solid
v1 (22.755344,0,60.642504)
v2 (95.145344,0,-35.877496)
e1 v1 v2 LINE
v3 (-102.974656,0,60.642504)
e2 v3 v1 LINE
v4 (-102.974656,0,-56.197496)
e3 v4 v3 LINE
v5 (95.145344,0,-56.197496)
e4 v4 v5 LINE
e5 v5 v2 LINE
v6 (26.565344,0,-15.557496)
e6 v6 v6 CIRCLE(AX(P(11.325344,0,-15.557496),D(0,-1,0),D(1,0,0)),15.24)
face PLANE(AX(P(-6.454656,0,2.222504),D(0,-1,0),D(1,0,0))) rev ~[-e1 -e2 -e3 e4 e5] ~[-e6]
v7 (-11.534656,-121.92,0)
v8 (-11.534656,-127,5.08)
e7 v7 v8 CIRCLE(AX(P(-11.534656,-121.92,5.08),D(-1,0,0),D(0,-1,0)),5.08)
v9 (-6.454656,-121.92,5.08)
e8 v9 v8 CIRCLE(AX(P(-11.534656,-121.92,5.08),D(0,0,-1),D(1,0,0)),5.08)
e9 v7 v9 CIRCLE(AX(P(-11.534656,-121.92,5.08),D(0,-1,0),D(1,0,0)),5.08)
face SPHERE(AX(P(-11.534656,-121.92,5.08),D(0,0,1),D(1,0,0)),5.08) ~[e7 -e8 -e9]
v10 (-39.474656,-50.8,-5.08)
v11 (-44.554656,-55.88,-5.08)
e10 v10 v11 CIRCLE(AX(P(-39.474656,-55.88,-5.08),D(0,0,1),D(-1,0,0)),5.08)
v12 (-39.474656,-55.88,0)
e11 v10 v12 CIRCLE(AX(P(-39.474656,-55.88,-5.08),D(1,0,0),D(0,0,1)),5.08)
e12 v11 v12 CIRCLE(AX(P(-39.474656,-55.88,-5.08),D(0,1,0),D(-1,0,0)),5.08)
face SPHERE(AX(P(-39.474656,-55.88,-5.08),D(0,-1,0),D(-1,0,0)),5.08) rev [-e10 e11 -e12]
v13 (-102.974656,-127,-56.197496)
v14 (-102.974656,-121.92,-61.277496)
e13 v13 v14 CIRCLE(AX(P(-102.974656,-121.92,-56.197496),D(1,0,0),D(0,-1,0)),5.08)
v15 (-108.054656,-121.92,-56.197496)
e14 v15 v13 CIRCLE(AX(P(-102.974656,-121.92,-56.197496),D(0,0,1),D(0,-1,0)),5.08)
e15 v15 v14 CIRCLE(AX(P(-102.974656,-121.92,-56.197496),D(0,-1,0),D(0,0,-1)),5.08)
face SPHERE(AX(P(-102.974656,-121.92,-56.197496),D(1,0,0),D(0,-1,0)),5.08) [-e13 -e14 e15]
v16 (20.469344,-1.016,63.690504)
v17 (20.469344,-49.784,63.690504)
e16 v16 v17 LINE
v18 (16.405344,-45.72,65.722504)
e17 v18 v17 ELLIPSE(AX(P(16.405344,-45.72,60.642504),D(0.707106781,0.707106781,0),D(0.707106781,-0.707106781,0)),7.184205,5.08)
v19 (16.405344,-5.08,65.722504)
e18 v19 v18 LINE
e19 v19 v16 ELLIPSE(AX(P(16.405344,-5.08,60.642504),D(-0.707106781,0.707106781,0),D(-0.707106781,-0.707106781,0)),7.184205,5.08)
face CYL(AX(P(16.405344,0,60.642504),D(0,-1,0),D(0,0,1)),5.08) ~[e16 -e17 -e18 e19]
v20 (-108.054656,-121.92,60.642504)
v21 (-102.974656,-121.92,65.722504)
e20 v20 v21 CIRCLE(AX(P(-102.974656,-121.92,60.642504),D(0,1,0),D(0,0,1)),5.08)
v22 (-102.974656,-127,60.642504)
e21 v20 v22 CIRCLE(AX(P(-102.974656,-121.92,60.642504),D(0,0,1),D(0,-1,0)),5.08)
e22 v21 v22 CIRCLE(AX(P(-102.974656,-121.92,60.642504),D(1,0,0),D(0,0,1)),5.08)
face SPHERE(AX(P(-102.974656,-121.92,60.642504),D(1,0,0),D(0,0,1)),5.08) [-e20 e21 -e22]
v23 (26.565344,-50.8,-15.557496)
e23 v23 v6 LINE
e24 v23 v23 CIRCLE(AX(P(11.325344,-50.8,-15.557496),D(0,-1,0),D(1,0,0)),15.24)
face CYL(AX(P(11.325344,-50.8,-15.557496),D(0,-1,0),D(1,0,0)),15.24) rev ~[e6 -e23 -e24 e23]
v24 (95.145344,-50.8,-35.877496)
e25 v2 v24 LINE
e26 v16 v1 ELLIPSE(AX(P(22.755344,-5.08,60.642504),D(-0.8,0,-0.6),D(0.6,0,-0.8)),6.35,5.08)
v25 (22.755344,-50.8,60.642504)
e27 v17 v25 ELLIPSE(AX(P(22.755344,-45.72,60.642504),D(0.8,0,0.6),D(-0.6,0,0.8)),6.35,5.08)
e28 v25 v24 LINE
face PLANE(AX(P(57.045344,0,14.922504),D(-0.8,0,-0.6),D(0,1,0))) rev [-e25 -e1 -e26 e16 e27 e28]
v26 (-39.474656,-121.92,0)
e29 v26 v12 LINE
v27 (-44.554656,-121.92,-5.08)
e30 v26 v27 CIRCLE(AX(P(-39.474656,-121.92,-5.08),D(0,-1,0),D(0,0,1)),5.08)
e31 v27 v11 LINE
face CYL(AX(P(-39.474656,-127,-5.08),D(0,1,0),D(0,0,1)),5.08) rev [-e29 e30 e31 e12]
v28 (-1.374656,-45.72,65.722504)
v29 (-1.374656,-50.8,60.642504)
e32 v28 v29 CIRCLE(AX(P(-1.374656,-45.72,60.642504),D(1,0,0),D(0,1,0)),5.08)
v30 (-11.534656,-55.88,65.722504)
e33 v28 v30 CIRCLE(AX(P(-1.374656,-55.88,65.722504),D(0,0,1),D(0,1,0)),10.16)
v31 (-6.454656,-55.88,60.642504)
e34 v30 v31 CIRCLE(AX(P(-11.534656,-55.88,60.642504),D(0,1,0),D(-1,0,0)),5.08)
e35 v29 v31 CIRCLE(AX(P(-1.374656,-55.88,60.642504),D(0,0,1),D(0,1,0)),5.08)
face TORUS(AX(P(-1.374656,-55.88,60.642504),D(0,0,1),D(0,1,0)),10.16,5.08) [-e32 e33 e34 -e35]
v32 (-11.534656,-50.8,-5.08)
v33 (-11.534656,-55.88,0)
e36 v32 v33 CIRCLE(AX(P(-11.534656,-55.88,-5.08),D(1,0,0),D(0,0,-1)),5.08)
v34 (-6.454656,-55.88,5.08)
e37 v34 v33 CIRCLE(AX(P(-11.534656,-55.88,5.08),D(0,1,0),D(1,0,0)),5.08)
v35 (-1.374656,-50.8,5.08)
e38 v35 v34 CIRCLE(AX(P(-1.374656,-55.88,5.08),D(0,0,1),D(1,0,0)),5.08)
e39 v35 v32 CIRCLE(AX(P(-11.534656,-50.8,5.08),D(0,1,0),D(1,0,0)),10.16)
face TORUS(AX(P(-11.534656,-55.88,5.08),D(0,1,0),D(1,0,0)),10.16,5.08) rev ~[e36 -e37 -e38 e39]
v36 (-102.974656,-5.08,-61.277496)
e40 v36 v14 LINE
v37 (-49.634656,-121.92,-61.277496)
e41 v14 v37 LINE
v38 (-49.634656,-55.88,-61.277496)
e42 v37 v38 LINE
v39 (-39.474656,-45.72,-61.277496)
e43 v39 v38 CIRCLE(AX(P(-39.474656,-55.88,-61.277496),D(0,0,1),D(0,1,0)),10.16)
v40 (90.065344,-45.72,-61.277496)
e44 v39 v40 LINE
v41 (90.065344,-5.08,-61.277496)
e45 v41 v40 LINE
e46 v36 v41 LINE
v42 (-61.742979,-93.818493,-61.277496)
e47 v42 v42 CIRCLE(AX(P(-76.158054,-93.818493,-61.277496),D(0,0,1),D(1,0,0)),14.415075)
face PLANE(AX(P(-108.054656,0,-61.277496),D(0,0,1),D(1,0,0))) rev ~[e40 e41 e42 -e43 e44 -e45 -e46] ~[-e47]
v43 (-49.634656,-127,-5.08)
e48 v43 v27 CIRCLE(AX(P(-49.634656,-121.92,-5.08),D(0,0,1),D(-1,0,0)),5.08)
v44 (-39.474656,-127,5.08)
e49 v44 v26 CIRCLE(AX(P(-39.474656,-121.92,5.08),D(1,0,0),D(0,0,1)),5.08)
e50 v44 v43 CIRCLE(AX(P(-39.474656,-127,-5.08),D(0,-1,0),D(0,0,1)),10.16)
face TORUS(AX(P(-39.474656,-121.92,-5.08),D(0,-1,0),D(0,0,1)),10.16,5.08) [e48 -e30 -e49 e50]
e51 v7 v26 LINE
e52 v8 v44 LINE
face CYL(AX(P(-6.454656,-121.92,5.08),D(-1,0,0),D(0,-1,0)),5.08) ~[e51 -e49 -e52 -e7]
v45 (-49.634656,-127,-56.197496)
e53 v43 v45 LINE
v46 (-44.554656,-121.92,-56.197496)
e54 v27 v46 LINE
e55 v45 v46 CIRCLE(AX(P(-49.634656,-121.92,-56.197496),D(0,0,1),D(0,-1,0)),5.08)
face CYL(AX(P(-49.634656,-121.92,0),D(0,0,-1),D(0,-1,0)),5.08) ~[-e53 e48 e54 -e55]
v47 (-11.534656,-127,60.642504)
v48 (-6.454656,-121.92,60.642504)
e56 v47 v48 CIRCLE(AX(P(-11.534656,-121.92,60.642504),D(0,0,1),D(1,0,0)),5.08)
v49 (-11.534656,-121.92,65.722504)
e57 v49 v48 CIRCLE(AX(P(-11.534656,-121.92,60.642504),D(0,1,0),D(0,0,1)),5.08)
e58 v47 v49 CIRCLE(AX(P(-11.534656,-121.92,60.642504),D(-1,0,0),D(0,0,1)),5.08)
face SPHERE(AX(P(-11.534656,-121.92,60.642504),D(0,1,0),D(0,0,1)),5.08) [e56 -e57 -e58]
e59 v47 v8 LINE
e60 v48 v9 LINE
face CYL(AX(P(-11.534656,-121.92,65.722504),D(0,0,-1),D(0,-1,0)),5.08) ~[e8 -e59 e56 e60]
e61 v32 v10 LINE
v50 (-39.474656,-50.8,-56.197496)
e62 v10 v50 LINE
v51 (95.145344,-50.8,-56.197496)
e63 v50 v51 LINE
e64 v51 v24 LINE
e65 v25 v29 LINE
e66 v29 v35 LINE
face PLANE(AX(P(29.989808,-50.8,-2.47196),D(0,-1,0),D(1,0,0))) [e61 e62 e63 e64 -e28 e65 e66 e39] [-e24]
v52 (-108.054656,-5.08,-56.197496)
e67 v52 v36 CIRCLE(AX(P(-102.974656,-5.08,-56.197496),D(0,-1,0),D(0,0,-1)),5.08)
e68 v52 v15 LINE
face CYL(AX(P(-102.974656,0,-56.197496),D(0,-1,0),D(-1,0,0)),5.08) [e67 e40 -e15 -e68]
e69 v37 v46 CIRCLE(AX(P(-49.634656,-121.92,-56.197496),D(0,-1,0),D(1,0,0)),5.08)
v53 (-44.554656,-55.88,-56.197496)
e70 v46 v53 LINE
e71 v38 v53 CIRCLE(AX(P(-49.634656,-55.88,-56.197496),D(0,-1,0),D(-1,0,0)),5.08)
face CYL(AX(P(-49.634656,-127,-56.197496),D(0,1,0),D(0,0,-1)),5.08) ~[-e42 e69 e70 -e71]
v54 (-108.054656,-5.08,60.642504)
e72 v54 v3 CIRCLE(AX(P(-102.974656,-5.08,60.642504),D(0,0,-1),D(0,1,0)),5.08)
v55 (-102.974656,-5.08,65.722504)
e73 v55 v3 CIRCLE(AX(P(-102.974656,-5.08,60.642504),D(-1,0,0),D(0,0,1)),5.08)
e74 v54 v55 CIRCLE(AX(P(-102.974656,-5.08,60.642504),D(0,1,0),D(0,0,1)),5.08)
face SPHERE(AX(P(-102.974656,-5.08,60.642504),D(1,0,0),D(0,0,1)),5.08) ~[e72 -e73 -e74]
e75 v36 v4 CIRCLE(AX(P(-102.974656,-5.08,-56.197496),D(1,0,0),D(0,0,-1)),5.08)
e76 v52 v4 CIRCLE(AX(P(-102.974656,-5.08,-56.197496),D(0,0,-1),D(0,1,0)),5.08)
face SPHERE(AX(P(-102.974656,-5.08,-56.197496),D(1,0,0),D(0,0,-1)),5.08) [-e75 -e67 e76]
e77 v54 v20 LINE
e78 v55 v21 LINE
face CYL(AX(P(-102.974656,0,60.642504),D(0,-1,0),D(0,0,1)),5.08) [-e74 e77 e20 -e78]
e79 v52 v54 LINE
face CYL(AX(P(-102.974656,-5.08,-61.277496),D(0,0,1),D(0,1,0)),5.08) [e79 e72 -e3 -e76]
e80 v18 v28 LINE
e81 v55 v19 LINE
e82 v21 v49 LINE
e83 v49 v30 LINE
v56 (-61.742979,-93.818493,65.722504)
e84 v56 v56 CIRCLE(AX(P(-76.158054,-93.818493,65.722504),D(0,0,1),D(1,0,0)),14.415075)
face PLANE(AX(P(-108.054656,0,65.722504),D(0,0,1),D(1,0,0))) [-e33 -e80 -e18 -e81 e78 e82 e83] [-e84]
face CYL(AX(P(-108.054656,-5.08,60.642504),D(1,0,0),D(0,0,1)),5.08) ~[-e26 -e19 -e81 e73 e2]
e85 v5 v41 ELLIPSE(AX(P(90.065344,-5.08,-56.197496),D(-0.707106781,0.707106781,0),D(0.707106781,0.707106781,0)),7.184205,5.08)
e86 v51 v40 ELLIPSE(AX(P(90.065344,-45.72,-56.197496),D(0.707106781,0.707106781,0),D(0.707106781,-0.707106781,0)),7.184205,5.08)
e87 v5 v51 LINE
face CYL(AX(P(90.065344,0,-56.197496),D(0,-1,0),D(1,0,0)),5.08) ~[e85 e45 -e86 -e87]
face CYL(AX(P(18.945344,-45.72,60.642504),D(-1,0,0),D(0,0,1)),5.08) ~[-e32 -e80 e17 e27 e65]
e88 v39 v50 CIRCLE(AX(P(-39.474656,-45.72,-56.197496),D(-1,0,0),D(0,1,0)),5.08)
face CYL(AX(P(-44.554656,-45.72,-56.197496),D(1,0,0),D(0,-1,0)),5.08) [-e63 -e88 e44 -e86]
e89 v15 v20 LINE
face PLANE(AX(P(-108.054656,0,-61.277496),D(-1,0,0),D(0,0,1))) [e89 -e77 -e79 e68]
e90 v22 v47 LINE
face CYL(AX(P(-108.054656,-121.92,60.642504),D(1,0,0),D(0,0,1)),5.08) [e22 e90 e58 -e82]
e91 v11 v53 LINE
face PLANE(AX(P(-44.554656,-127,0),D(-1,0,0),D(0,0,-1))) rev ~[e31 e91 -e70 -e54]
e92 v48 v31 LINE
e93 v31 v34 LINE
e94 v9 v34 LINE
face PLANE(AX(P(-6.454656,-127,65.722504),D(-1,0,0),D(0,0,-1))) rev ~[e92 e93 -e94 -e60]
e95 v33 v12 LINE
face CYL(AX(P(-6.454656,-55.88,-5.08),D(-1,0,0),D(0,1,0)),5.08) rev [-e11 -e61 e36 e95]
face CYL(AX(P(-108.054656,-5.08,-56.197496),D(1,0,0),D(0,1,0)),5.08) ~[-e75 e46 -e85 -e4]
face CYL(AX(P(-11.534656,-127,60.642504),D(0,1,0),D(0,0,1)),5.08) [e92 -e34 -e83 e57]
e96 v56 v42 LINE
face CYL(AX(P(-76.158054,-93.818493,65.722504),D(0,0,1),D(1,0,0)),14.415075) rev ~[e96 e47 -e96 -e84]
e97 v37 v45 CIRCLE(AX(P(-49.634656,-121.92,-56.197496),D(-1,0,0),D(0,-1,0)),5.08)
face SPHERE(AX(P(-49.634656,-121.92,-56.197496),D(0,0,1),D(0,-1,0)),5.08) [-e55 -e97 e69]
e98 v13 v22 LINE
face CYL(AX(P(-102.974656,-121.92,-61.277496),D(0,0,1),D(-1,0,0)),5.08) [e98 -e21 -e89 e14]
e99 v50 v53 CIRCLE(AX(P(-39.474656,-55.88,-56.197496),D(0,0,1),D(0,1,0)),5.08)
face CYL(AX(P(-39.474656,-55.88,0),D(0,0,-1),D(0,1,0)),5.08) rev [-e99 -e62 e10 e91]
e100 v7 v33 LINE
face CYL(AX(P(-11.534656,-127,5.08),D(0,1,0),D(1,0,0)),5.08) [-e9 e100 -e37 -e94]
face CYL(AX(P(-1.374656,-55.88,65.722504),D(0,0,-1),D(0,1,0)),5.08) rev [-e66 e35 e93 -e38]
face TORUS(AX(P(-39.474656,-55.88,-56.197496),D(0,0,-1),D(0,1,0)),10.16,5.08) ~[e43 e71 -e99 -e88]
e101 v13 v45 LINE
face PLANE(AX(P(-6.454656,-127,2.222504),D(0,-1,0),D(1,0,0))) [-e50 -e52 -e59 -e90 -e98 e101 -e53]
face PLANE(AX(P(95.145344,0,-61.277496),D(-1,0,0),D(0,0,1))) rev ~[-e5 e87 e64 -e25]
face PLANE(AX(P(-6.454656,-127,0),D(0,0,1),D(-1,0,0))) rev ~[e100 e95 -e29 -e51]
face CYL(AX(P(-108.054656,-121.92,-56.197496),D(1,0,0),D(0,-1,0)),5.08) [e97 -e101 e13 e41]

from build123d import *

# Parameters (mm, degrees)
F0_W     = 203.2
F0_H     = 127
F1_DEPTH = 127
F3_DEPTH = 76.2
F4_SIZE2 = 101.6
F4_SIZE  = 76.2
F5_R     = 5.08
F6_R     = 15.24
F7_DEPTH = 50.8
F8_R     = 14.4150748184
F9_DEPTH = 127


with BuildPart() as f1:
    # F0 (on Front) → F1 (new body)
    with BuildSketch(Plane.XZ):
        with Locations((-6.4546563804, 2.2225044668)):
            Rectangle(F0_W, F0_H)
    extrude(amount=F1_DEPTH)

    # F2 (on face) → F3 (cut)
    with BuildSketch(Plane.XZ.offset(127)):
        Polygon((95.1453436196, 65.7225044668), (-6.4546563804, 65.7225044668), (-6.4546563804, 0), (-44.5546563804, 0), (-44.5546563804, -61.2774955332), (95.1453436196, -61.2774955332), align=None)
    extrude(amount=-F3_DEPTH, mode=Mode.SUBTRACT)

    # F4
    f4_edges = [f1.edges().sort_by_distance(p)[0] for p in [
        (95.145344, -25.4, 65.722504),
    ]]
    f4_side = f1.faces().sort_by_distance((-28.226085, -52.614286, 65.722504))[0]
    chamfer(f4_edges, length=F4_SIZE, length2=F4_SIZE2, reference=f4_side)

    # F5
    f5_edges = [f1.edges().sort_by_distance(p)[0] for p in [
        (-6.454656, -88.9, 65.722504),
        (-57.254656, -127, 65.722504),
        (-6.454656, -127, 32.861252),
        (-6.454656, -88.9, 0),
        (-6.454656, -50.8, 32.861252),
        (18.945344, -25.4, 65.722504),
        (-44.554656, 0, 65.722504),
        (-108.054656, -63.5, 65.722504),
        (6.245344, -50.8, 65.722504),
        (-25.504656, -127, 0),
        (-44.554656, -127, -30.638748),
        (-76.304656, -127, -61.277496),
        (-108.054656, -127, 2.222504),
        (-44.554656, -88.9, 0),
        (-44.554656, -88.9, -61.277496),
        (-44.554656, -50.8, -30.638748),
        (-6.454656, 0, -61.277496),
        (95.145344, -25.4, -61.277496),
        (25.295344, -50.8, -61.277496),
        (-108.054656, -63.5, -61.277496),
        (-108.054656, 0, 2.222504),
        (-25.504656, -50.8, 0),
    ]]
    fillet(f5_edges, radius=F5_R)

    # F6 (on face) → F7 (cut, through all)
    with BuildSketch(Plane.XZ.offset(50.8)):
        with Locations((11.3253436196, -15.5574955332)):
            Circle(F6_R)
    extrude(amount=-F7_DEPTH, mode=Mode.SUBTRACT)

    # F8 (on face) → F9 (cut, through all)
    with BuildSketch(Plane.XY.offset(65.7225044668)):
        with Locations((-76.158054173, -93.8184931874)):
            Circle(F8_R)
    extrude(amount=-F9_DEPTH, mode=Mode.SUBTRACT)


solid = f1.part
